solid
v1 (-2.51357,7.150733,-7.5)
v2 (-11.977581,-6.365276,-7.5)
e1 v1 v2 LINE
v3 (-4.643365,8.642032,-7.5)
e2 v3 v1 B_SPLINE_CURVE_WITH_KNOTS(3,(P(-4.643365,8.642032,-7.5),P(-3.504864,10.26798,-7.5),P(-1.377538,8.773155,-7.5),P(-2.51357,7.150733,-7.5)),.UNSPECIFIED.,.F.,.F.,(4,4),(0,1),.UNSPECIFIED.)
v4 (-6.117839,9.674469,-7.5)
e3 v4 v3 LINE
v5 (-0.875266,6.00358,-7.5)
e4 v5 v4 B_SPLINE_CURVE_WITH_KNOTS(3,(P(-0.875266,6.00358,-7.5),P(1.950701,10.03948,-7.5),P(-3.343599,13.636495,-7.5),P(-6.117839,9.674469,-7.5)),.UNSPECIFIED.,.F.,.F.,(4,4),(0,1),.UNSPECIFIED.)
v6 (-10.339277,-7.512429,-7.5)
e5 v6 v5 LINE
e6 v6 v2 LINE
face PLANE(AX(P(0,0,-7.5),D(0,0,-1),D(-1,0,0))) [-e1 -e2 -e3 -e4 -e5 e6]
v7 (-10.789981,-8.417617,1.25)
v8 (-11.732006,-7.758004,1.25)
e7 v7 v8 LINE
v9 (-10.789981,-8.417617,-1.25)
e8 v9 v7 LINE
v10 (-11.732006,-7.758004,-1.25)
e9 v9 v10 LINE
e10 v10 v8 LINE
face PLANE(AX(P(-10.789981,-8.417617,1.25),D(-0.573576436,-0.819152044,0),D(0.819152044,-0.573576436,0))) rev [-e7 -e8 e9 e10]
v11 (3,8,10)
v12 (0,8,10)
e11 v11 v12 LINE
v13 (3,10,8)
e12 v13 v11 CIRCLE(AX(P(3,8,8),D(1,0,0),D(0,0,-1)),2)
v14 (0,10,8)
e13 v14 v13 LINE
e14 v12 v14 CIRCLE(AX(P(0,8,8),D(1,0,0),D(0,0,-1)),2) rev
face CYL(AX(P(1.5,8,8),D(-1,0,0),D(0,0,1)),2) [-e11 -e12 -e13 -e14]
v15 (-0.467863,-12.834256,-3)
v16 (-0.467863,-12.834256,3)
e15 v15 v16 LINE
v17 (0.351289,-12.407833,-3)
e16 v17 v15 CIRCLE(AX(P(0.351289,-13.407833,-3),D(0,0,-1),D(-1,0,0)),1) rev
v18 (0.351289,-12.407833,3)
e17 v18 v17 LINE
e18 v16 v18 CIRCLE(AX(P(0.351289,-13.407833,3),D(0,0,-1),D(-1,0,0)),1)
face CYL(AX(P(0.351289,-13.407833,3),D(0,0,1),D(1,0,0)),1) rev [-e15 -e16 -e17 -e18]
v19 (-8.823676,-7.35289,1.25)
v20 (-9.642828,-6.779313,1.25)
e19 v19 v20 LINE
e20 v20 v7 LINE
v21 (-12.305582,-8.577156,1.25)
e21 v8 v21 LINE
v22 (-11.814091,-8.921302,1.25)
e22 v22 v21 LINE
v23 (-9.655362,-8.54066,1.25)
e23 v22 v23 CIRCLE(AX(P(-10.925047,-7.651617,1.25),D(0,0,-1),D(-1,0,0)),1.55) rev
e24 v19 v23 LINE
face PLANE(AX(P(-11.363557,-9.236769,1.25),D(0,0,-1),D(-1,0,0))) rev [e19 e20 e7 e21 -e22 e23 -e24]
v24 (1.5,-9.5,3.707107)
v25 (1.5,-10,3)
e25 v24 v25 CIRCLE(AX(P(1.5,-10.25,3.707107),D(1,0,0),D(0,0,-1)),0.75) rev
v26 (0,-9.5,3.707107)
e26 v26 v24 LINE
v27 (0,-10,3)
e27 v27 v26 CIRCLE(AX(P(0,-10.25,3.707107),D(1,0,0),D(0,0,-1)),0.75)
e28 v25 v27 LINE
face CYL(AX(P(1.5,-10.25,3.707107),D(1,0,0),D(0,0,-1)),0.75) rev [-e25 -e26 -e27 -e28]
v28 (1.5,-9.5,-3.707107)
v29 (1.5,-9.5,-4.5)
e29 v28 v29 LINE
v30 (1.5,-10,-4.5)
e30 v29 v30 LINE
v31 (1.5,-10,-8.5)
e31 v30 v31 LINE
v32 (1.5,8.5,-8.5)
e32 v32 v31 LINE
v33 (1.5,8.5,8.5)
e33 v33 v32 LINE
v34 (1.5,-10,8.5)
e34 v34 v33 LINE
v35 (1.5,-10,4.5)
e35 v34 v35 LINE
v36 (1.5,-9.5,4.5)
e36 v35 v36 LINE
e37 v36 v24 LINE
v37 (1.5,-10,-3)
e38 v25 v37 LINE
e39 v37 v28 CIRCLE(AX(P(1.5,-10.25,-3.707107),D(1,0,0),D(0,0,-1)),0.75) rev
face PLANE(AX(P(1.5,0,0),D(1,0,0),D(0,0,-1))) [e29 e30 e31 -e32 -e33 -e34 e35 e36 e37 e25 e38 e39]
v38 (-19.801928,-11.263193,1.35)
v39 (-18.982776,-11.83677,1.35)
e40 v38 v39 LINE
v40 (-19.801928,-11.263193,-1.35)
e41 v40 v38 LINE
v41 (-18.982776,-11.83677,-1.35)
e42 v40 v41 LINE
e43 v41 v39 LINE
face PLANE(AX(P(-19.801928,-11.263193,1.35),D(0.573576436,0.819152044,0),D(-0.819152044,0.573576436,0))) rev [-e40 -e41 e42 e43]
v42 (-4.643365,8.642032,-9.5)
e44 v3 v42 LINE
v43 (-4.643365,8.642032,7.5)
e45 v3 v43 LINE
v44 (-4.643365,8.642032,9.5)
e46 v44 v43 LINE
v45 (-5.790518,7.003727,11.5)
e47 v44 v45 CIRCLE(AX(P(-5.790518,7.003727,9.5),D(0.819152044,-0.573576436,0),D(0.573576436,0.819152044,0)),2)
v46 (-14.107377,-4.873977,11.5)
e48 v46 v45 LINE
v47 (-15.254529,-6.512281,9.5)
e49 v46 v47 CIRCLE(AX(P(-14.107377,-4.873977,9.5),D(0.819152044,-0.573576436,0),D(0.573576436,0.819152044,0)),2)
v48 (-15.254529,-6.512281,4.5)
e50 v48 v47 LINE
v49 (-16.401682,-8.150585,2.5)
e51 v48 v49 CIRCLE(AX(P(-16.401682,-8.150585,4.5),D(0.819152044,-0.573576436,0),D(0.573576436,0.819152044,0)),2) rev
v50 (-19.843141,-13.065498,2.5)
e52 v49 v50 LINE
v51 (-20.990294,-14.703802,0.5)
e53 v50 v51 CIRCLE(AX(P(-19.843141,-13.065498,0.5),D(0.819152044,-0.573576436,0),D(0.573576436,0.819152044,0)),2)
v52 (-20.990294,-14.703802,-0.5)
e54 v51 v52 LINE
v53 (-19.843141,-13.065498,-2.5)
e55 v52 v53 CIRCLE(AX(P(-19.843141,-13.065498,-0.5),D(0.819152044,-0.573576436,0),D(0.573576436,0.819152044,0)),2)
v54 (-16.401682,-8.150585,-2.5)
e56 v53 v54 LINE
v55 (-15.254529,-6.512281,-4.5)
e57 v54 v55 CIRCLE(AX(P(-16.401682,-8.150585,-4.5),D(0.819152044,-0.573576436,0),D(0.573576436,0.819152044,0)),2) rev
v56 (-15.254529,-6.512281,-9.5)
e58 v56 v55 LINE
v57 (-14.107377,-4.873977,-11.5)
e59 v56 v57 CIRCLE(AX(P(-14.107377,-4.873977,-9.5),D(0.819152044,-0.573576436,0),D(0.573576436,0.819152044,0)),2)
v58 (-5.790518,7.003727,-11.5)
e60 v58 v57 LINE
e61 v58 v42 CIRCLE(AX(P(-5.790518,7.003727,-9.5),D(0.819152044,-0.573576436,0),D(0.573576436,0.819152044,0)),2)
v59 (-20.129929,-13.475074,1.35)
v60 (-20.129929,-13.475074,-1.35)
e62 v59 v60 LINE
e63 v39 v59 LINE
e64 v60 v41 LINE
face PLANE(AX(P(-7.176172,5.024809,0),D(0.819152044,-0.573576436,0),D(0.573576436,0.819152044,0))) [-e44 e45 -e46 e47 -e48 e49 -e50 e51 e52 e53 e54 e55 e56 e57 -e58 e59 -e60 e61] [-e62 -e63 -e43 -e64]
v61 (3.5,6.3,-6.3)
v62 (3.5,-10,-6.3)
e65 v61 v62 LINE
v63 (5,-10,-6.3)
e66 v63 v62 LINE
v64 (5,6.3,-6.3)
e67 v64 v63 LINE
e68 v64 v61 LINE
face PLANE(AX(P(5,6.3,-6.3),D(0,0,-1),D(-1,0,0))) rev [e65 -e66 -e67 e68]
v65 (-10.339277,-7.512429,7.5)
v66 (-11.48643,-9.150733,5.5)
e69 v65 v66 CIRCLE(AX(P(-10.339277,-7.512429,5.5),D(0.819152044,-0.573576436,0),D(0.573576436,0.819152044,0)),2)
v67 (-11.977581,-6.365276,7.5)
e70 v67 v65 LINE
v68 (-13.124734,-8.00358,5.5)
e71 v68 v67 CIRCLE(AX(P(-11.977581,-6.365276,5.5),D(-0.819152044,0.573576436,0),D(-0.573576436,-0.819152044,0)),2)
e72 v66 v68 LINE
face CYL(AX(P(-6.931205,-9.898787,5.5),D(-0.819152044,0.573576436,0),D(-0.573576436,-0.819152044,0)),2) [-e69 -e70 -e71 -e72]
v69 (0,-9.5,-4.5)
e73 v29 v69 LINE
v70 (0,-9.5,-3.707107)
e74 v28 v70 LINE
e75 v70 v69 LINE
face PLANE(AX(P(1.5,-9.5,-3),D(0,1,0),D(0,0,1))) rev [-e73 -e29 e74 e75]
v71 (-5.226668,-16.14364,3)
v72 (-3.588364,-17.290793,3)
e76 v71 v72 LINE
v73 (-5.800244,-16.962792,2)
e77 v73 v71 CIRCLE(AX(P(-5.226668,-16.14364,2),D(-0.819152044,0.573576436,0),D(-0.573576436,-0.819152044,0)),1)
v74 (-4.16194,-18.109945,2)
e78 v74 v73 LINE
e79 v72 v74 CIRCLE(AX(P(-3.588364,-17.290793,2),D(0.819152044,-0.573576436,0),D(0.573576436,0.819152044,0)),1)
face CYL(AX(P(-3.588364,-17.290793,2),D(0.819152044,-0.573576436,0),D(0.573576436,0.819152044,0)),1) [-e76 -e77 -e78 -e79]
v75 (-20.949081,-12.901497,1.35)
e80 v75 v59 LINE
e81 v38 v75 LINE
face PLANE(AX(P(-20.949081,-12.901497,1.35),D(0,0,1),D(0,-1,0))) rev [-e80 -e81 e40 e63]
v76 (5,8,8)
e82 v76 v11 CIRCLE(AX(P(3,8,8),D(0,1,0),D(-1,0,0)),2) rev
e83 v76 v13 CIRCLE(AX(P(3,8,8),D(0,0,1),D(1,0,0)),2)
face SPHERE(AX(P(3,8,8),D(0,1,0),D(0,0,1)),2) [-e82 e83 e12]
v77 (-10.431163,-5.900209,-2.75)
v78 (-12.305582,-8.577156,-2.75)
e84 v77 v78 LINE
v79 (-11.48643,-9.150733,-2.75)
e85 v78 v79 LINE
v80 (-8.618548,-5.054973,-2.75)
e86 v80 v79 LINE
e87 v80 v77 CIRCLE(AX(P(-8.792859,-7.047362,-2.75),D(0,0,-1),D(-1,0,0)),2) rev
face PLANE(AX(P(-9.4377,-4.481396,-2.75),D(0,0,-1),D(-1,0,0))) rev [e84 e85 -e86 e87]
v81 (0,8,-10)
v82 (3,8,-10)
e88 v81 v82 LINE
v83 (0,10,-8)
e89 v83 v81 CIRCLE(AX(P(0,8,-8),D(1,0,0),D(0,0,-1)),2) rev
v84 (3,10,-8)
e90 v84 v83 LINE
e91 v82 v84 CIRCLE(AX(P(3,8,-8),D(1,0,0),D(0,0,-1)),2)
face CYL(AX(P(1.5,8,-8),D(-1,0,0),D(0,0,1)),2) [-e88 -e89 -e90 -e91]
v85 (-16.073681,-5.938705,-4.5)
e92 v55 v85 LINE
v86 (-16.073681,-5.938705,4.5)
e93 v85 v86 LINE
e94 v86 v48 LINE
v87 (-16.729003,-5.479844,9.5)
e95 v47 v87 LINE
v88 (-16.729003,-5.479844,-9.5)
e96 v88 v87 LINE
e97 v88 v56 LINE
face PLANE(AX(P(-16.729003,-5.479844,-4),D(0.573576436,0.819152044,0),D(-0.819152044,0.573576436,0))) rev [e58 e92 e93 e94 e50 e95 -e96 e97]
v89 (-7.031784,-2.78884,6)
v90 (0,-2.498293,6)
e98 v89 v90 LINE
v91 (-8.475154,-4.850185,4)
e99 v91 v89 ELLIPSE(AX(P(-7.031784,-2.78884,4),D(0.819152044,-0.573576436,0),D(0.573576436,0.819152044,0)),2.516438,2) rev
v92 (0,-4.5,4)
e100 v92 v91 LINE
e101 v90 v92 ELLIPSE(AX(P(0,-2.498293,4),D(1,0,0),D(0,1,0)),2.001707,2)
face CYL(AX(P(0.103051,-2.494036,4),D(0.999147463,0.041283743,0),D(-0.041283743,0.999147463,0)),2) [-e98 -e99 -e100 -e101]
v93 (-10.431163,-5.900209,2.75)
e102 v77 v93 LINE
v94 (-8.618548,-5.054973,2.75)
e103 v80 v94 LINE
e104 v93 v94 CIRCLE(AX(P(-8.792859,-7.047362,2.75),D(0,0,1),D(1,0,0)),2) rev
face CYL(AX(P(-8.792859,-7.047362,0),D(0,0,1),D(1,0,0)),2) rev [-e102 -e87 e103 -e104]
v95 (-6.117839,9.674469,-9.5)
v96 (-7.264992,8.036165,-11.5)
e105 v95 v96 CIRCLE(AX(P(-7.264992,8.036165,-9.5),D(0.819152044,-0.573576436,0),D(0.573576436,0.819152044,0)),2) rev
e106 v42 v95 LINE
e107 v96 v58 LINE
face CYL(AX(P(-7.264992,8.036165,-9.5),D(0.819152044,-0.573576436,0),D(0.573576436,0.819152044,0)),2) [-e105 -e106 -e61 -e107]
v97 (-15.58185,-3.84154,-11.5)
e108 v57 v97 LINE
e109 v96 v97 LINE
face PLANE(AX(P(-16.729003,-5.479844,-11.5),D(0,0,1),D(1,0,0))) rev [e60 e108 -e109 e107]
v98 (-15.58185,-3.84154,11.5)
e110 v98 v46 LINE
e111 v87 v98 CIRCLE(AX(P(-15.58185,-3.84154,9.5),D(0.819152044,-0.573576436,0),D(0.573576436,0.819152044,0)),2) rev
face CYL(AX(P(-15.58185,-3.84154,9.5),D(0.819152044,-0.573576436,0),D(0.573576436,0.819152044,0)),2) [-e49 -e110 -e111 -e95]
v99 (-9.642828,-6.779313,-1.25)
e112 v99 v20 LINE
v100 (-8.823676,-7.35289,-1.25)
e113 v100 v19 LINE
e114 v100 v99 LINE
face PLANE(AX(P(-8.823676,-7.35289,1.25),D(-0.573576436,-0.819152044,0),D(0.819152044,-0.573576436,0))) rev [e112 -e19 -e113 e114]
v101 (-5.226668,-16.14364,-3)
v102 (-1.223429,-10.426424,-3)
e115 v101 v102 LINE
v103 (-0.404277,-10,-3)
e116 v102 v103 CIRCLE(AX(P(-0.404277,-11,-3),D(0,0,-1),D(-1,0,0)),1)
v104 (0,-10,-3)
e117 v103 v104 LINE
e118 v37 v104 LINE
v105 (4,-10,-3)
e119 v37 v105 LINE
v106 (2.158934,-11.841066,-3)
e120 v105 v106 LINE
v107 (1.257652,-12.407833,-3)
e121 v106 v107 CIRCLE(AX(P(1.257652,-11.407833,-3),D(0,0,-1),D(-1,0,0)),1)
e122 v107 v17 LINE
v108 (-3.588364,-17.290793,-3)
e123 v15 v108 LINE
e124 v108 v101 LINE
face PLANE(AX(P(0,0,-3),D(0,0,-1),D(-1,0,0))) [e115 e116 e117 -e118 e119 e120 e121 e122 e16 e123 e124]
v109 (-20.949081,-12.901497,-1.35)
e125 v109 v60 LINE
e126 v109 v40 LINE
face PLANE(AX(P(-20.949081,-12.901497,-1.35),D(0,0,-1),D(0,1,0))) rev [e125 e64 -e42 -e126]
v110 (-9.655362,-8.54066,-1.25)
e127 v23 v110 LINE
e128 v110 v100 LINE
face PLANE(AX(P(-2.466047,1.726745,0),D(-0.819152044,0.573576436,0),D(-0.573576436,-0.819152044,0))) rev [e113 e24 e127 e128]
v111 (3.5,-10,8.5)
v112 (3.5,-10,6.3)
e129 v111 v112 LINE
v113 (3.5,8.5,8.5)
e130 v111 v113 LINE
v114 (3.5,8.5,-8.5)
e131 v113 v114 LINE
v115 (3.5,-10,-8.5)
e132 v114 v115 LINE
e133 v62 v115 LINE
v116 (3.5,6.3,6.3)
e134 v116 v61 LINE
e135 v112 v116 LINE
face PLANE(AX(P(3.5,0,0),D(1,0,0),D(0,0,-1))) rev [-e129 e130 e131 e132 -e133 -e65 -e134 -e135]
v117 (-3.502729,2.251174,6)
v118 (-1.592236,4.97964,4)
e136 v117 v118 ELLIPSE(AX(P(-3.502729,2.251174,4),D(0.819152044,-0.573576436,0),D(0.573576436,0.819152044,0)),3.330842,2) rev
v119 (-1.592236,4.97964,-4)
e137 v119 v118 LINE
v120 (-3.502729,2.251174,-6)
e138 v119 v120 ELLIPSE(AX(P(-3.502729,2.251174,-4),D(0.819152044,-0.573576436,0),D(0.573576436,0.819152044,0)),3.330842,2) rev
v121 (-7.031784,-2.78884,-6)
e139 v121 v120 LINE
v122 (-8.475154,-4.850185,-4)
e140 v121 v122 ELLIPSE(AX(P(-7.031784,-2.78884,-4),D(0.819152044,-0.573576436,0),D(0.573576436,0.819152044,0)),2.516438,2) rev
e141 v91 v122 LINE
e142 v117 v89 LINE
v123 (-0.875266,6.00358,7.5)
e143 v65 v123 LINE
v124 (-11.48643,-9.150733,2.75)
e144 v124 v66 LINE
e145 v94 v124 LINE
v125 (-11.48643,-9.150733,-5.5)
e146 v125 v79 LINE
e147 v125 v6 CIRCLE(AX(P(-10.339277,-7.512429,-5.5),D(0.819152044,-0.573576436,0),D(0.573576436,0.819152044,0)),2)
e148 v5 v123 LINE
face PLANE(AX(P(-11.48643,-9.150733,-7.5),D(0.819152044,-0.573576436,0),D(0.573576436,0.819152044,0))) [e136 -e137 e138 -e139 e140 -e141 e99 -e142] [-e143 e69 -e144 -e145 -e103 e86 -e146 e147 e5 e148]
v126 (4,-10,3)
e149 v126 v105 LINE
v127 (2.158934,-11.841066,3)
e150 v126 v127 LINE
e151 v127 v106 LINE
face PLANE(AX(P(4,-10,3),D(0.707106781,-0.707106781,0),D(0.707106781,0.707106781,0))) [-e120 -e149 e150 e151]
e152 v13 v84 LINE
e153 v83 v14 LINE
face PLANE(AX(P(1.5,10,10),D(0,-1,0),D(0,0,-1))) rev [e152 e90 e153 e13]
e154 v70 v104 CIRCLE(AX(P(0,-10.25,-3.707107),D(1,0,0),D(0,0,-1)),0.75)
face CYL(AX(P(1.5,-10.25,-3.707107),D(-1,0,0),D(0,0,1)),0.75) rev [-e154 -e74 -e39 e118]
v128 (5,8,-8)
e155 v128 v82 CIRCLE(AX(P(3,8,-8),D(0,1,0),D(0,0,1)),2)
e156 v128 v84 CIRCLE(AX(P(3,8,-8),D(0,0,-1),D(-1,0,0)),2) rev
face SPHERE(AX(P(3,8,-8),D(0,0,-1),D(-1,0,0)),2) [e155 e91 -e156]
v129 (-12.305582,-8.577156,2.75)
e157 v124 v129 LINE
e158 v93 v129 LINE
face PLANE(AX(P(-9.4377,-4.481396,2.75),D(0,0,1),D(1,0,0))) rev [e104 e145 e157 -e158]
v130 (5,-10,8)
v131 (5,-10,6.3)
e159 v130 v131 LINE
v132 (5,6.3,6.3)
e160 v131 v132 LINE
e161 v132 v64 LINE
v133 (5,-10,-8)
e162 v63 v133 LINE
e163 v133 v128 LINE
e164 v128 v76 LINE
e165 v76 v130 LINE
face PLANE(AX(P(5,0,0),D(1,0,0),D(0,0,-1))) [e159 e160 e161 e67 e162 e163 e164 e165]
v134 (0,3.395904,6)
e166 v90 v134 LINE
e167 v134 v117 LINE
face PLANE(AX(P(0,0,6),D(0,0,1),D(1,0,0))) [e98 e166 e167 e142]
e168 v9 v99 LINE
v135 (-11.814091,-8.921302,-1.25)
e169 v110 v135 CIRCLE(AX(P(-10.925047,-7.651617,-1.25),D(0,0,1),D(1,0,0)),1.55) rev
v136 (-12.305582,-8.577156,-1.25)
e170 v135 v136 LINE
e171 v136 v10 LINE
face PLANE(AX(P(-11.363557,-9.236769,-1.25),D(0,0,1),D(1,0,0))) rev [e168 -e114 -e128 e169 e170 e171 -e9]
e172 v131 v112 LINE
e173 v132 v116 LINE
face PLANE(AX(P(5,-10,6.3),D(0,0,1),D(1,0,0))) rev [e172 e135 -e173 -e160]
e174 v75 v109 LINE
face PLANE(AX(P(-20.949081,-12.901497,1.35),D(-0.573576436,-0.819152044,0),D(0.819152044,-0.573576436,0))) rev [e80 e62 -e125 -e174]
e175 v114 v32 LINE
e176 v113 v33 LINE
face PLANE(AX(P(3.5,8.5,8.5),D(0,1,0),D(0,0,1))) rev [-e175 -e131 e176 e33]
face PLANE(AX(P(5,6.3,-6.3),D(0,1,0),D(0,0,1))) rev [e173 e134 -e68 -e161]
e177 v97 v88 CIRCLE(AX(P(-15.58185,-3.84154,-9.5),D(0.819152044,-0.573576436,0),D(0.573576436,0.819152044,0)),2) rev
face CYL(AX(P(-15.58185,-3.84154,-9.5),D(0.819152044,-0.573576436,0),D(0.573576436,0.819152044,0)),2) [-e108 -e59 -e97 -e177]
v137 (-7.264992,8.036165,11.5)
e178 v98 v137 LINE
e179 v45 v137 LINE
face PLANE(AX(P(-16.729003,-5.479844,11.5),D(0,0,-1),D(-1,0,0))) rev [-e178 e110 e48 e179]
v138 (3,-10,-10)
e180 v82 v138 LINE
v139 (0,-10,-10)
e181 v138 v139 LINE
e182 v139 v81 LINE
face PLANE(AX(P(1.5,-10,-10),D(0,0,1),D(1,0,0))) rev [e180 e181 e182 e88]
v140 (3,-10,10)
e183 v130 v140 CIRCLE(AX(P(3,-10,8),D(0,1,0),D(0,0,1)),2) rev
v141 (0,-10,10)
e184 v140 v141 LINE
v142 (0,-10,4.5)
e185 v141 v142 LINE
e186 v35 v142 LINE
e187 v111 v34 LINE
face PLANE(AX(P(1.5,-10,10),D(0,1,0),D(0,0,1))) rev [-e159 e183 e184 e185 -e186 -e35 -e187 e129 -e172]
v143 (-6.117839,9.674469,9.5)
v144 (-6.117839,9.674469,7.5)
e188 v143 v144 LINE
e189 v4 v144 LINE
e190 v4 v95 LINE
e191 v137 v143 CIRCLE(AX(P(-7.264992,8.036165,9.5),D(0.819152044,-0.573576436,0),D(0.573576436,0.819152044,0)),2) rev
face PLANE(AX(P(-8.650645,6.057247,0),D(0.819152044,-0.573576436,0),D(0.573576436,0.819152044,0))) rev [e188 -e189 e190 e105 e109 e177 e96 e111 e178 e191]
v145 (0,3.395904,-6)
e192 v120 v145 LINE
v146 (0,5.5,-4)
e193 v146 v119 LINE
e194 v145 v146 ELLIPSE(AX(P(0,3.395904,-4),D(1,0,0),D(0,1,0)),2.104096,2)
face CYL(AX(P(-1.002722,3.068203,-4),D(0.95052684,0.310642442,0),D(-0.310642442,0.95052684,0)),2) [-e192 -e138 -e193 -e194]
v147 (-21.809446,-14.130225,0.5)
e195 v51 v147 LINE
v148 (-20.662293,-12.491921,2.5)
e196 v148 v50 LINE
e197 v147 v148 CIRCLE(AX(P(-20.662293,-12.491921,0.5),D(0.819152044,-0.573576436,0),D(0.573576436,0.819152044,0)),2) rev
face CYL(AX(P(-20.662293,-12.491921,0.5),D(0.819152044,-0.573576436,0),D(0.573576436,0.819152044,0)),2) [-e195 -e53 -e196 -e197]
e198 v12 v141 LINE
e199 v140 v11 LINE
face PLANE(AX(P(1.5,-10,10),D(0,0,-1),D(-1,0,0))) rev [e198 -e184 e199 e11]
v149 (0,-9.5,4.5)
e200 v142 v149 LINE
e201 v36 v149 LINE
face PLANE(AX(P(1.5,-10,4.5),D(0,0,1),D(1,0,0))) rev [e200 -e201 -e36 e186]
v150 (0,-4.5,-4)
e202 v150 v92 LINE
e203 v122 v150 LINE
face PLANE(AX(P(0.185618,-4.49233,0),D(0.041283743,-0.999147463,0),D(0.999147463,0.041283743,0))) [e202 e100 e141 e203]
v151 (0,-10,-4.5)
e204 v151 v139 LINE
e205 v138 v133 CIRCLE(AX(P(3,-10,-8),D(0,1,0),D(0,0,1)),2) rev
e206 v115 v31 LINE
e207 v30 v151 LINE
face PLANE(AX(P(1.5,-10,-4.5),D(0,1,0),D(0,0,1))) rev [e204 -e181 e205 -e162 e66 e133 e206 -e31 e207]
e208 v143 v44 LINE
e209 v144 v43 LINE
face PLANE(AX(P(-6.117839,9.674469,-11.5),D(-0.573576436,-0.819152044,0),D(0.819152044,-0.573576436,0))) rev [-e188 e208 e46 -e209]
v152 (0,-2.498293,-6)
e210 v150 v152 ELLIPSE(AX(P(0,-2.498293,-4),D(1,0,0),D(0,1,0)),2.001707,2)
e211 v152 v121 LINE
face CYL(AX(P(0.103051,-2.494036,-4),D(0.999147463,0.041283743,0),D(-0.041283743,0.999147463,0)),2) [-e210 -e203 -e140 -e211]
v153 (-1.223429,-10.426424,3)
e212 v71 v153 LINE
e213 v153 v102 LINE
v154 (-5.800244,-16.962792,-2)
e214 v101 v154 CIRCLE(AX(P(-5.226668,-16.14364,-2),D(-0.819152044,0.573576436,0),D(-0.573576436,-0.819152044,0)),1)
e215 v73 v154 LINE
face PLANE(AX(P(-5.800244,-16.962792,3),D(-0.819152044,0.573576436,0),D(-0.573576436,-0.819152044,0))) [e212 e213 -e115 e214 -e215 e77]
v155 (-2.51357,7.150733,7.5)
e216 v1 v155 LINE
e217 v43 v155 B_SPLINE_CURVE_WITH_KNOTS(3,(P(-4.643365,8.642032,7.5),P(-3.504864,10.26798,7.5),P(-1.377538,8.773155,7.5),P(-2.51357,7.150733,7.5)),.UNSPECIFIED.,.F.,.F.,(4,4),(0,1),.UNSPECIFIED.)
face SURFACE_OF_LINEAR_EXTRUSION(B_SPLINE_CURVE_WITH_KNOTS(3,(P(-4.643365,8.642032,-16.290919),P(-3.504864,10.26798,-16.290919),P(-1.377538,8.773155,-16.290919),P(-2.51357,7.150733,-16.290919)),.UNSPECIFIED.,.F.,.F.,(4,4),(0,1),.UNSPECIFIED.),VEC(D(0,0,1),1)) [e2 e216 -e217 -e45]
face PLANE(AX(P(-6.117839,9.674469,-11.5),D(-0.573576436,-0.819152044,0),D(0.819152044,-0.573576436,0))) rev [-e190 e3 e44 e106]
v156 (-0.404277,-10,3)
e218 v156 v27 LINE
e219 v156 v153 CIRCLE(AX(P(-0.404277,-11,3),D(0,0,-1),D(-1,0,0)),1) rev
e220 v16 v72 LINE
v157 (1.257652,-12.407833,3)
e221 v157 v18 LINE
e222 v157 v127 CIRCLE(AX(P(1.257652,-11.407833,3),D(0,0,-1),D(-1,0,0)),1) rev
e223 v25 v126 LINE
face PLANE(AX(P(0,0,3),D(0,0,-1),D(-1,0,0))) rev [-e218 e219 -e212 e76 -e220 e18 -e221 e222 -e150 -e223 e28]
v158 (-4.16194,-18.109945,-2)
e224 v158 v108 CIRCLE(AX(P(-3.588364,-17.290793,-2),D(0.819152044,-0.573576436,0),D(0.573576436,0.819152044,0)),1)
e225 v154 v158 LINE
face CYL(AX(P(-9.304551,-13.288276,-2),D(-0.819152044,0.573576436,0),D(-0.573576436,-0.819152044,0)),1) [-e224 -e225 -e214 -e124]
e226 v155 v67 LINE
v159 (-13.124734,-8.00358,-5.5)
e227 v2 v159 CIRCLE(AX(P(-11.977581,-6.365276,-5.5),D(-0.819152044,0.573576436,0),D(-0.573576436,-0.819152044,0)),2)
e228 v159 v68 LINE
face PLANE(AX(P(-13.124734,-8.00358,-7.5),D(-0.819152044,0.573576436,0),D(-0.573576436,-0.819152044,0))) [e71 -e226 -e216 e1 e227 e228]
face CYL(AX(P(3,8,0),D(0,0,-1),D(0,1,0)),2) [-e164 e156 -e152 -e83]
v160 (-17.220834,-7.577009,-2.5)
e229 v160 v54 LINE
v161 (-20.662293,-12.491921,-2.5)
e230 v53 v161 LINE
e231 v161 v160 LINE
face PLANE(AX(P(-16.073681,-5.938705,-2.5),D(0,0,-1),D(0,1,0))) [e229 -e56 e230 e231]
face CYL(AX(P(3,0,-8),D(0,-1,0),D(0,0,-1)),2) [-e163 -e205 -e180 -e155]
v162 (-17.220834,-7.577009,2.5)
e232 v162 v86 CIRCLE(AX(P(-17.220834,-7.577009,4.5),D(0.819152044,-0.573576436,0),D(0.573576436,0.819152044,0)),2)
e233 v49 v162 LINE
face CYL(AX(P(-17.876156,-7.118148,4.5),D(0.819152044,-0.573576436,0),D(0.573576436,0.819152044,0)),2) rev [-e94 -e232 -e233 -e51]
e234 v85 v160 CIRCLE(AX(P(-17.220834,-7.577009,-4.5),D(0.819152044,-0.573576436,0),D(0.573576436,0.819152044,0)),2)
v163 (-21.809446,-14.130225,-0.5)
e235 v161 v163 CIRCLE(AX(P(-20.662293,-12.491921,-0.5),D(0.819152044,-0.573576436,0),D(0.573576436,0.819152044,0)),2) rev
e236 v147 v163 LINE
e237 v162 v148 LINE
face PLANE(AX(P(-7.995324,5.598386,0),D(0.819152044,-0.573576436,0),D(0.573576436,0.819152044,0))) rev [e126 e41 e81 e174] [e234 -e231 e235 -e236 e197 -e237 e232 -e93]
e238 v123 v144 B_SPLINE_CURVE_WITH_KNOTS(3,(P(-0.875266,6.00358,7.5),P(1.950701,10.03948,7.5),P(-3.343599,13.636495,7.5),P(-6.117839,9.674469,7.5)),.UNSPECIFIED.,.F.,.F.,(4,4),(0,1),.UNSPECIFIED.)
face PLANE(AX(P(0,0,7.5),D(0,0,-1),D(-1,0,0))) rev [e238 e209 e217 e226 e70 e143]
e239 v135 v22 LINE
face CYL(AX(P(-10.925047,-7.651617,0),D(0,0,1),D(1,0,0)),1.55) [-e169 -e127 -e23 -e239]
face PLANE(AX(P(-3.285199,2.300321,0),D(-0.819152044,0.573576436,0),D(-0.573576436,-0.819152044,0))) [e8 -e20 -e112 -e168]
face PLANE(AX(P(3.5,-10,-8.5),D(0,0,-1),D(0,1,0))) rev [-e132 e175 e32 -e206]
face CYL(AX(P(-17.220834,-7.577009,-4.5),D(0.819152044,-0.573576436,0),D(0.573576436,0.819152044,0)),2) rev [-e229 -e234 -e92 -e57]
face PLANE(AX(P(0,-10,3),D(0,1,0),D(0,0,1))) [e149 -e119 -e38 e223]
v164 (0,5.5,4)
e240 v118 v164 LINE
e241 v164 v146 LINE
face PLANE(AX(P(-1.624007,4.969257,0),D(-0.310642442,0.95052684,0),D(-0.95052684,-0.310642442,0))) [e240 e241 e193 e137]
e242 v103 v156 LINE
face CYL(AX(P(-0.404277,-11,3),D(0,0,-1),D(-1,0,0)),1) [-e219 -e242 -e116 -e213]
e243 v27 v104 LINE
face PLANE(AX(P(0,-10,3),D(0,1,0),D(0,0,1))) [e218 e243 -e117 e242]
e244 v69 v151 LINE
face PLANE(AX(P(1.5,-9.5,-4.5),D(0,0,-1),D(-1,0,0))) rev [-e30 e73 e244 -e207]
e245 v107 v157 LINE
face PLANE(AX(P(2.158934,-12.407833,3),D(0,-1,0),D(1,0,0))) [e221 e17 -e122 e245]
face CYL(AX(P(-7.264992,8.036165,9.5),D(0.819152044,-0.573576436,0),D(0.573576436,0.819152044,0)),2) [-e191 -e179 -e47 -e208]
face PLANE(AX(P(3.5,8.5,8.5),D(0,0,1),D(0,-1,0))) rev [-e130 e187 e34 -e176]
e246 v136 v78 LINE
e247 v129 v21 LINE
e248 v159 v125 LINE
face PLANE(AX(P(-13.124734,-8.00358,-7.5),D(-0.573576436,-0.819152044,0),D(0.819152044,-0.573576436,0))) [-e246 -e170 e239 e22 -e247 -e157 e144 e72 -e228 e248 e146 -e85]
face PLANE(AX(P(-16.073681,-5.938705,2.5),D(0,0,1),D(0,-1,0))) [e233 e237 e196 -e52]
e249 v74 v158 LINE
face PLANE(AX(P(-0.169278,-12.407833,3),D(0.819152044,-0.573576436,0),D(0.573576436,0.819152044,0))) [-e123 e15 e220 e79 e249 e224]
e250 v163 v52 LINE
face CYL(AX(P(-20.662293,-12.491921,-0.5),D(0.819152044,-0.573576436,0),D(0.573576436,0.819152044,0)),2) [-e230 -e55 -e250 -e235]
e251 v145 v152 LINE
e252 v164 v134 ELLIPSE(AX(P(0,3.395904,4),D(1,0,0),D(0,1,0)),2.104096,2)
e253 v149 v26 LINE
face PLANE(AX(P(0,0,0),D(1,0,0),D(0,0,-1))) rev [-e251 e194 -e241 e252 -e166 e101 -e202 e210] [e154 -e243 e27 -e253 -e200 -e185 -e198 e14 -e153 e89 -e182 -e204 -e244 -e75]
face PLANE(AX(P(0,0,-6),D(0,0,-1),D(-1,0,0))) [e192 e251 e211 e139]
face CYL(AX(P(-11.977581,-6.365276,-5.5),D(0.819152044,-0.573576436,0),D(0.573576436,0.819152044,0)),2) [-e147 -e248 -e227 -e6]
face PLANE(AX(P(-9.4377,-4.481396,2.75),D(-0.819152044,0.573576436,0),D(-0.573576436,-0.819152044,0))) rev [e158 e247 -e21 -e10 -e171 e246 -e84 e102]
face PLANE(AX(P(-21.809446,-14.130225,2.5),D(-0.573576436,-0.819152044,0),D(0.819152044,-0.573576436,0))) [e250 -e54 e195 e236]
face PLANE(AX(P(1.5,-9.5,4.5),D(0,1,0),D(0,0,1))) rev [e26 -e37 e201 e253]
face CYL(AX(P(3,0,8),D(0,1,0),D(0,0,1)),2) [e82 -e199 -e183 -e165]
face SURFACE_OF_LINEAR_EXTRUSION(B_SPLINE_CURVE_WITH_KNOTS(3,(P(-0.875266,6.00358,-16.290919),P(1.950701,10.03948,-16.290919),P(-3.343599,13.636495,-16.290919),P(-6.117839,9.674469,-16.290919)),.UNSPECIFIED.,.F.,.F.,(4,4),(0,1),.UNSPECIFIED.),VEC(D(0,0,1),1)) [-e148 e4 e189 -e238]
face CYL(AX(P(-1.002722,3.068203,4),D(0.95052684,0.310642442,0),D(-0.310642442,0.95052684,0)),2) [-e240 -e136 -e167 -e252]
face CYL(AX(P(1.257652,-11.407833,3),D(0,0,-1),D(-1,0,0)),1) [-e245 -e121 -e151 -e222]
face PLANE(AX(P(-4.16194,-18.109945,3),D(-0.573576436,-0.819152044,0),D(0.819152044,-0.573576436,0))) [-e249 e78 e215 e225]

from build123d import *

# Parameters (mm, degrees)
BOSS_EXTRUDE1_DEPTH      = 1.5
FILLET7_R                = 0.75
BOSS_EXTRUDE2_DEPTH      = 2
BOSS_EXTRUDE3_DEPTH      = 1.5
BOSS_EXTRUDE5_DEPTH      = 3
BOSS_EXTRUDE5_DEPTH_BACK = 3
BOSS_EXTRUDE4_DEPTH      = 7.5
BOSS_EXTRUDE4_DEPTH_BACK = 7.5
BOSS_EXTRUDE6_DEPTH      = 1.8
BOSS_EXTRUDE7_DEPTH      = 15
SKETCH18_W               = 1
SKETCH18_H               = 5.5
CUT_EXTRUDE2_DEPTH       = 5
FILLET8_R                = 2
SKETCH14_W               = 2.5
SKETCH14_H               = 1
BOSS_EXTRUDE9_DEPTH      = 1.15
SKETCH16_W               = 2.5
SKETCH16_H               = 3
BOSS_EXTRUDE11_DEPTH     = 1
SKETCH15_W               = 5
SKETCH15_H               = 10
SKETCH15_W_2             = 2.7
SKETCH15_H_2             = 2
BOSS_EXTRUDE10_DEPTH     = 1
FILLET2_R                = 1
FILLET3_R                = 2
FILLET4_R                = 2
FILLET5_R                = 1.55


with BuildPart() as part:
    # Sketch1 → Boss-Extrude1 (new body)
    with BuildSketch(Plane(origin=(0, 0, 0), x_dir=(0, 0, -1), z_dir=(1, 0, 0))):
        Polygon((-10, -10), (-10, 10), (10, 10), (10, -10), (4.5, -10), (4.5, -9.5), (3, -9.5), (3, -10), (-3, -10), (-3, -9.5), (-4.5, -9.5), (-4.5, -10), align=None)
    extrude(amount=BOSS_EXTRUDE1_DEPTH)

    # Fillet7
    # the kernel refuses this fillet: 0.75 mm, written as the material it adds along each edge
    with BuildSketch(Plane(origin=(0, -9.5, -3), x_dir=(0, 0, -1), z_dir=(1, 0, 0))) as fillet7_piece_1:
        with BuildLine():
            CenterArc((0.707106781, -0.75), FILLET7_R, 90, 70.528779366)
            Line((0, -0.5), (-0.014142136, -0.495))
            ThreePointArc((-0.014142136, -0.495), (-0.015, -0.25), (-0.015, 0))
            Line((-0.015, 0), (0, 0.015))
            Line((0, 0.015), (0.707106781, 0.015))
            Line((0.707106781, 0.015), (0.707106781, 0))
        make_face()
    extrude(amount=1.5)
    with BuildSketch(Plane(origin=(0, -9.5, 3), x_dir=(0, -1, 0), z_dir=(1, 0, 0))) as fillet7_piece_2:
        with BuildLine():
            CenterArc((0.75, -0.707106781), FILLET7_R, 109.471220634, 70.528779366)
            Line((0, -0.707106781), (-0.015, -0.707106781))
            Line((-0.015, -0.707106781), (-0.015, 0))
            Line((-0.015, 0), (0, 0.015))
            ThreePointArc((0, 0.015), (0.25, 0.015), (0.495, 0.014142136))
            Line((0.495, 0.014142136), (0.5, 0))
        make_face()
    extrude(amount=1.5)

    # Sketch3 → Boss-Extrude2 (add)
    with BuildSketch(Plane(origin=(1.5, 0, 0), x_dir=(0, 0, -1), z_dir=(1, 0, 0))):
        Polygon((-10, 10), (-10, -10), (-8.5, -10), (-8.5, 8.5), (8.5, 8.5), (8.5, -10), (10, -10), (10, 10), align=None)
    extrude(amount=BOSS_EXTRUDE2_DEPTH)

    # Sketch5 → Boss-Extrude3 (add)
    with BuildSketch(Plane(origin=(3.5, 0, 0), x_dir=(0, 0, -1), z_dir=(1, 0, 0))):
        Polygon((-10, 10), (-10, -10), (-6.3, -10), (-6.3, 6.3), (6.3, 6.3), (6.3, -10), (10, -10), (10, 10), align=None)
    extrude(amount=BOSS_EXTRUDE3_DEPTH)

    # Sketch9 → Boss-Extrude5 (add, two sides: drawn at the far end of the back side and taken through both)
    with BuildSketch(Plane.XY.offset(-BOSS_EXTRUDE5_DEPTH_BACK)):
        Polygon((0, -10), (4, -10), (2.158934381, -11.841065619), (2.158934381, -12.407832924), (-0.169277933, -12.407832924), (-4.161939967, -18.109945249), (-5.800244055, -16.962792376), (-0.924844346, -10), align=None)
    extrude(amount=BOSS_EXTRUDE5_DEPTH + BOSS_EXTRUDE5_DEPTH_BACK)



with BuildPart() as body_2:
    # Sketch6 → Boss-Extrude4 (new, two sides: drawn at the far end of the back side and taken through both)
    with BuildSketch(Plane.XY.offset(-BOSS_EXTRUDE4_DEPTH_BACK)):
        Polygon((-13.124734081, -8.003579973), (-11.486429992, -9.150732846), (-0.875265919, 6.003579973), (-2.513570008, 7.150732846), align=None)
    extrude(amount=BOSS_EXTRUDE4_DEPTH + BOSS_EXTRUDE4_DEPTH_BACK)


with BuildPart() as part_1:
    add(part.part)

    add(body_2.part)  # Loft1 merges body 2
    # Sketch7 → Loft1 section 0
    with BuildSketch(Plane(origin=(-3.408072147, 2.386357808, 0), x_dir=(0, 0, -1), z_dir=(0.8191520442889888, -0.5735764363510506, 0))):
        with BuildLine():
            Line((-6, -8.834187099), (6, -8.834187099))
            Line((6, -8.834187099), (6, 3.165812901))
            Line((6, 3.165812901), (-6, 3.165812901))
            Line((-6, 3.165812901), (-6, -8.834187099))
        make_face()
    # Sketch8 → Loft1 section 1
    with BuildSketch(Plane.ZY):
        with BuildLine():
            Line((-6, -4.5), (6, -4.5))
            Line((6, -4.5), (6, 5.5))
            Line((6, 5.5), (-6, 5.5))
            Line((-6, 5.5), (-6, -4.5))
        make_face()
    loft()



with BuildPart() as body_2_2:
    # Sketch11 → Boss-Extrude6 (new body)
    with BuildSketch(Plane(origin=(-7.176171551, 5.024809415, 0), x_dir=(0, 0, 1), z_dir=(-0.8191520442889889, 0.5735764363510503, 0))):
        Polygon((-11.5, -14.084187099), (-4, -14.084187099), (11.5, -14.084187099), (11.5, 4.415812901), (-11.5, 4.415812901), align=None)
    extrude(amount=BOSS_EXTRUDE6_DEPTH)


with BuildPart() as part_2:
    add(part_1.part)

    add(body_2_2.part)  # Boss-Extrude7 merges body 2 2
    # Sketch12 → Boss-Extrude7 (add)
    with BuildSketch(Plane.XY.offset(7.5)):
        with BuildLine():
            Line((-6.117839003, 9.674469166), (-4.643365323, 8.642031581))
            add(Edge.make_bspline(
                [(-4.643365323, 8.642031581), (-3.504863732, 10.267980359), (-1.377538094, 8.77315456), (-2.513570008, 7.150732846)],
                knots=[0, 0, 0, 0, 1, 1, 1, 1], degree=3))
            Line((-2.513570008, 7.150732846), (-0.875265919, 6.003579973))
            add(Edge.make_bspline(
                [(-6.117839003, 9.674469166), (-3.343598781, 13.636494809), (1.950701407, 10.039479578), (-0.875265919, 6.003579973)],
                knots=[0, 0, 0, 0, 1, 1, 1, 1], degree=3))
        make_face()
    extrude(amount=-BOSS_EXTRUDE7_DEPTH)

    # Sketch18 → Cut-Extrude2 (cut)
    with BuildSketch(Plane(origin=(-8.078357845, -11.537090654, 0), x_dir=(0.8191520442889898, -0.5735764363510492, 0), z_dir=(-0.573576436351049, -0.8191520442889897, 0))):
        with Locations((-4.660487874, 0)):
            Rectangle(SKETCH18_W, SKETCH18_H)
    extrude(amount=-CUT_EXTRUDE2_DEPTH, mode=Mode.SUBTRACT)

    # Fillet8
    # the kernel refuses this fillet: 2 mm, written as the material it adds along each edge
    with BuildSketch(Plane(origin=(-9.437699854, -4.481396188, -7.080127019), x_dir=(0.8191520442889484, -0.5735764363511082, 0), z_dir=(0, 0, 1))) as fillet8_piece_1:
        with BuildLine():
            CenterArc((2, -1.732050808), FILLET8_R, 120, 60)
            Line((0, -1.732050808), (-0.04, -1.732050808))
            Line((-0.04, -1.732050808), (-0.04, 0))
            Line((-0.04, 0), (0, 0.04))
            ThreePointArc((0, 0.04), (0.5, 0.04), (0.98, 0.034641016))
            Line((0.98, 0.034641016), (1, 0))
        make_face()
    extrude(amount=14.160254038)

    # Sketch14 → Boss-Extrude9 (add)
    with BuildSketch(Plane(origin=(-4.227224191, 2.959934244, 0), x_dir=(0, 0, -1), z_dir=(0.8191520442889896, -0.5735764363510492, 0))):
        with Locations((0, -13.584187099)):
            Rectangle(SKETCH14_W, SKETCH14_H)
    extrude(amount=BOSS_EXTRUDE9_DEPTH)

    # Sketch16 → Boss-Extrude11 (add)
    with BuildSketch(Plane(origin=(-3.28519934, 2.300321343, 0), x_dir=(0, 0, -1), z_dir=(0.8191520442889892, -0.5735764363510499, 0))):
        with Locations((0, -12.584187099)):
            Rectangle(SKETCH16_W, SKETCH16_H)
    extrude(amount=BOSS_EXTRUDE11_DEPTH)

    # Sketch15 → Boss-Extrude10 (add)
    with BuildSketch(Plane(origin=(-7.176171551, 5.024809415, 0), x_dir=(0, 0, -1), z_dir=(0.8191520442889889, -0.5735764363510503, 0))):
        with Locations((0, -19.084187099)):
            Rectangle(SKETCH15_W, SKETCH15_H)
        with Locations((0, -21.584187099)):
            Rectangle(SKETCH15_W_2, SKETCH15_H_2, mode=Mode.SUBTRACT)
    extrude(amount=-BOSS_EXTRUDE10_DEPTH)

    # Fillet2
    # the kernel refuses this fillet: 1 mm, written as the material it adds along each edge
    with BuildSketch(Plane(origin=(-0.169277933, -12.407832924, 3), x_dir=(1, 0, 0), z_dir=(0, 0, -1))) as fillet2_piece_1:
        with BuildLine():
            CenterArc((FILLET2_R * 0.520567050552, FILLET2_R), FILLET2_R, 215, 55)
            Line((-FILLET2_R * 0.298584993737, FILLET2_R * 0.426423563649), (0, 0))
            Line((0, 0), (FILLET2_R * 0.520567050552, 0))
        make_face()
    extrude(amount=6)
    # the kernel refuses this fillet: 1 mm, written as the material it takes off along each edge
    with BuildSketch(Plane(origin=(2.158934381, -12.407832924, 5.253205262), x_dir=(0, 1, 0), z_dir=(0, 0, -1))) as fillet2_2_piece_1:
        with BuildLine():
            CenterArc((1, -0.901282105), FILLET2_R, 115.672890719, 64.327109281)
            Line((0, -0.901282105), (0, 0))
            Line((0, 0), (0.566767305, 0))
        make_face()
    extrude(amount=10.506410523, mode=Mode.SUBTRACT)
    with BuildSketch(Plane(origin=(-2.114059856, -19.54388634, -3), x_dir=(0.5735764363510425, 0.8191520442889944, 0), z_dir=(-0.8191520442889945, 0.5735764363510425, 0))) as fillet2_2_piece_2:
        with BuildLine():
            CenterArc((FILLET2_R, -FILLET2_R), FILLET2_R, 90, 90)
            Line((0, -FILLET2_R), (0, 0))
            Line((0, 0), (FILLET2_R, 0))
        make_face()
    extrude(amount=7, mode=Mode.SUBTRACT)
    with BuildSketch(Plane(origin=(-2.114059856, -19.54388634, 3), x_dir=(0.5735764363510425, 0.8191520442889944, 0), z_dir=(-0.8191520442889945, 0.5735764363510425, 0))) as fillet2_2_piece_3:
        with BuildLine():
            CenterArc((FILLET2_R, FILLET2_R), FILLET2_R, 180, 90)
            Line((0, FILLET2_R), (0, 0))
            Line((0, 0), (FILLET2_R, 0))
        make_face()
    extrude(amount=7, mode=Mode.SUBTRACT)
    with BuildSketch(Plane(origin=(-0.924844346, -10, -4.301417626), x_dir=(1, 0, 0), z_dir=(0, 0, 1))) as fillet2_2_piece_4:
        with BuildLine():
            CenterArc((FILLET2_R * 0.520567050552, -FILLET2_R), FILLET2_R, 90, 55)
            Line((-FILLET2_R * 0.298584993737, -FILLET2_R * 0.426423563649), (0, 0))
            Line((0, 0), (FILLET2_R * 0.520567050552, 0))
        make_face()
    extrude(amount=8.602835253, mode=Mode.SUBTRACT)

    # Fillet3
    fillet3_edges = [part_2.edges().sort_by_distance(p)[0] for p in [
        (-21.399869781, -14.417013464, 2.5),
        (-15.664105418, -6.225493021, 2.5),
        (-15.664105418, -6.225493021, -2.5),
        (-21.399869781, -14.417013464, -2.5),
    ]]
    fillet(fillet3_edges, radius=FILLET3_R)

    # Fillet4
    # the kernel refuses this fillet: 2 mm, written as the material it takes off along each edge
    with BuildSketch(Plane(origin=(3, 8, 8), x_dir=(0, 0, 1), z_dir=(0, 1, 0))) as fillet4_piece_1_section:
        Polygon((0, 0), (FILLET4_R * 1.02, 0), (FILLET4_R * 1.02, FILLET4_R * 1.02), (0, FILLET4_R * 1.02), align=None)
    fillet4_piece_1 = extrude(amount=FILLET4_R * 1.02, mode=Mode.PRIVATE)
    fillet4_piece_1 = fillet4_piece_1 - Plane(origin=(3, 8, 8), x_dir=(-0.7071067811865475, 0, -0.7071067811865475), z_dir=(0, 1, 0)) * Sphere(FILLET4_R, mode=Mode.PRIVATE)
    add(fillet4_piece_1, mode=Mode.SUBTRACT)
    with BuildSketch(Plane(origin=(3, 8, -8), x_dir=(0, 0, -1), z_dir=(0, 1, 0))) as fillet4_piece_2_section:
        Polygon((0, 0), (FILLET4_R * 1.02, 0), (FILLET4_R * 1.02, -FILLET4_R * 1.02), (0, -FILLET4_R * 1.02), align=None)
    fillet4_piece_2 = extrude(amount=FILLET4_R * 1.02, mode=Mode.PRIVATE)
    fillet4_piece_2 = fillet4_piece_2 - Plane(origin=(3, 8, -8), x_dir=(-0.7071067811865475, 0, 0.7071067811865475), z_dir=(0, 1, 0)) * Sphere(FILLET4_R, mode=Mode.PRIVATE)
    add(fillet4_piece_2, mode=Mode.SUBTRACT)
    with BuildSketch(Plane(origin=(5, 8, 10), x_dir=(0, 0, -1), z_dir=(0, -1, 0))) as fillet4_piece_3:
        with BuildLine():
            CenterArc((FILLET4_R, -FILLET4_R), FILLET4_R, 90, 90)
            Line((0, -FILLET4_R), (0, 0))
            Line((0, 0), (FILLET4_R, 0))
        make_face()
    extrude(amount=23, mode=Mode.SUBTRACT)
    with BuildSketch(Plane(origin=(5, 10, -8), x_dir=(0, -1, 0), z_dir=(0, 0, 1))) as fillet4_piece_4:
        with BuildLine():
            CenterArc((FILLET4_R, -FILLET4_R), FILLET4_R, 90, 90)
            Line((0, -FILLET4_R), (0, 0))
            Line((0, 0), (FILLET4_R, 0))
        make_face()
    extrude(amount=16, mode=Mode.SUBTRACT)
    with BuildSketch(Plane(origin=(5, -15, -10), x_dir=(-1, 0, 0), z_dir=(0, 1, 0))) as fillet4_piece_5:
        with BuildLine():
            CenterArc((FILLET4_R, FILLET4_R), FILLET4_R, 180, 90)
            Line((0, FILLET4_R), (0, 0))
            Line((0, 0), (FILLET4_R, 0))
        make_face()
    extrude(amount=23, mode=Mode.SUBTRACT)
    with BuildSketch(Plane(origin=(3, 10, -10), x_dir=(0, -1, 0), z_dir=(-1, 0, 0))) as fillet4_piece_6_section:
        with BuildLine():
            CenterArc((FILLET4_R, FILLET4_R), FILLET4_R, 180, 90)
            Line((0, FILLET4_R), (0, 0))
            Line((0, 0), (FILLET4_R, 0))
        make_face()
    fillet4_piece_6 = extrude(amount=8, mode=Mode.PRIVATE)
    fillet4_piece_6 = split(fillet4_piece_6, bisect_by=Plane(origin=(-0.152626661, 5.497582517, -10), z_dir=(0.5735764363510504, 0.8191520442889889, 0)), keep=Keep.TOP, mode=Mode.PRIVATE)
    add(fillet4_piece_6, mode=Mode.SUBTRACT)
    with BuildSketch(Plane(origin=(3, 10, 10), x_dir=(0, 0, -1), z_dir=(-1, 0, 0))) as fillet4_piece_7_section:
        with BuildLine():
            CenterArc((FILLET4_R, FILLET4_R), FILLET4_R, 180, 90)
            Line((0, FILLET4_R), (0, 0))
            Line((0, 0), (FILLET4_R, 0))
        make_face()
    fillet4_piece_7 = extrude(amount=8, mode=Mode.PRIVATE)
    fillet4_piece_7 = split(fillet4_piece_7, bisect_by=Plane(origin=(-0.152626661, 5.497582517, 10), z_dir=(0.5735764363510504, 0.8191520442889889, 0)), keep=Keep.TOP, mode=Mode.PRIVATE)
    add(fillet4_piece_7, mode=Mode.SUBTRACT)
    with BuildSketch(Plane(origin=(-0.547605102, 5.774149399, -11.5), x_dir=(0, 0, 1), z_dir=(-0.8191520442889889, 0.5735764363510504, 0)), Plane(origin=(-11.158769174, -9.380163421, -11.5), x_dir=(0.5735764363510504, 0.8191520442889889, 0), z_dir=(-0.8191520442889889, 0.5735764363510504, 0)), Plane(origin=(-0.547605102, 5.774149399, 11.5), x_dir=(-0.5735764363510504, -0.8191520442889888, 0), z_dir=(-0.8191520442889889, 0.5735764363510504, 0))) as fillet4_piece_8:
        with BuildLine():
            CenterArc((FILLET4_R, -FILLET4_R), FILLET4_R, 90, 90)
            Line((0, -FILLET4_R), (0, 0))
            Line((0, 0), (FILLET4_R, 0))
        make_face()
    extrude(amount=11.8, mode=Mode.SUBTRACT)
    with BuildSketch(Plane(origin=(-11.158769174, -9.380163421, 11.5), x_dir=(0.5735764363510504, 0.8191520442889888, 0), z_dir=(-0.8191520442889889, 0.5735764363510504, 0))) as fillet4_piece_9:
        with BuildLine():
            CenterArc((FILLET4_R, FILLET4_R), FILLET4_R, 180, 90)
            Line((0, FILLET4_R), (0, 0))
            Line((0, 0), (FILLET4_R, 0))
        make_face()
    extrude(amount=11.8, mode=Mode.SUBTRACT)
    with BuildSketch(Plane(origin=(-6.344870663, 3.426427706, -6), x_dir=(0.310642442370597, -0.9505268397041876, 0), z_dir=(0.9505268397041876, 0.310642442370597, 0))) as fillet4_piece_10_section:
        with BuildLine():
            CenterArc((FILLET4_R, -FILLET4_R), FILLET4_R, 90, 90)
            Line((0, -FILLET4_R), (0, 0))
            Line((0, 0), (FILLET4_R, 0))
        make_face()
    fillet4_piece_10 = extrude(amount=11.675109422, mode=Mode.PRIVATE)
    fillet4_piece_10 = split(fillet4_piece_10, bisect_by=Plane(origin=(-3.885576276, 1.704411238, -6), z_dir=(0.8191520442889891, -0.5735764363510499, 0)), keep=Keep.TOP, mode=Mode.PRIVATE)
    fillet4_piece_10 = split(fillet4_piece_10, bisect_by=Plane(origin=(0, 3.426427706, -6), z_dir=(-1, 0, 0)), keep=Keep.TOP, mode=Mode.PRIVATE)
    add(fillet4_piece_10, mode=Mode.SUBTRACT)
    with BuildSketch(Plane(origin=(-6.344870663, 3.426427706, 6), x_dir=(0, 0, -1), z_dir=(0.9505268397041876, 0.3106424423705969, 0))) as fillet4_piece_11_section:
        with BuildLine():
            CenterArc((FILLET4_R, -FILLET4_R), FILLET4_R, 90, 90)
            Line((0, -FILLET4_R), (0, 0))
            Line((0, 0), (FILLET4_R, 0))
        make_face()
    fillet4_piece_11 = extrude(amount=11.675109422, mode=Mode.PRIVATE)
    fillet4_piece_11 = split(fillet4_piece_11, bisect_by=Plane(origin=(-3.885576276, 1.704411238, 6), z_dir=(0.8191520442889891, -0.5735764363510499, 0)), keep=Keep.TOP, mode=Mode.PRIVATE)
    fillet4_piece_11 = split(fillet4_piece_11, bisect_by=Plane(origin=(0, 3.426427706, 6), z_dir=(-1, 0, 0)), keep=Keep.TOP, mode=Mode.PRIVATE)
    add(fillet4_piece_11, mode=Mode.SUBTRACT)
    with BuildSketch(Plane(origin=(-13.470891015, -5.056603329, -6), x_dir=(-0.041283743098950804, 0.9991474628680893, 0), z_dir=(0.9991474628680892, 0.0412837430989508, 0))) as fillet4_piece_12_section:
        with BuildLine():
            CenterArc((FILLET4_R, FILLET4_R), FILLET4_R, 180, 90)
            Line((0, FILLET4_R), (0, 0))
            Line((0, 0), (FILLET4_R, 0))
        make_face()
    fillet4_piece_12 = extrude(amount=18.48238525, mode=Mode.PRIVATE)
    fillet4_piece_12 = split(fillet4_piece_12, bisect_by=Plane(origin=(-10.215686034, -7.335922395, -6), z_dir=(0.8191520442889891, -0.5735764363510499, 0)), keep=Keep.TOP, mode=Mode.PRIVATE)
    fillet4_piece_12 = split(fillet4_piece_12, bisect_by=Plane(origin=(0, -5.056603329, -6), z_dir=(-1, 0, 0)), keep=Keep.TOP, mode=Mode.PRIVATE)
    add(fillet4_piece_12, mode=Mode.SUBTRACT)
    with BuildSketch(Plane(origin=(-13.470891015, -5.056603329, 6), x_dir=(0, 0, -1), z_dir=(0.9991474628680892, 0.0412837430989508, 0))) as fillet4_piece_13_section:
        with BuildLine():
            CenterArc((FILLET4_R, FILLET4_R), FILLET4_R, 180, 90)
            Line((0, FILLET4_R), (0, 0))
            Line((0, 0), (FILLET4_R, 0))
        make_face()
    fillet4_piece_13 = extrude(amount=18.48238525, mode=Mode.PRIVATE)
    fillet4_piece_13 = split(fillet4_piece_13, bisect_by=Plane(origin=(-10.215686034, -7.335922395, 6), z_dir=(0.8191520442889891, -0.5735764363510499, 0)), keep=Keep.TOP, mode=Mode.PRIVATE)
    fillet4_piece_13 = split(fillet4_piece_13, bisect_by=Plane(origin=(0, -5.056603329, 6), z_dir=(-1, 0, 0)), keep=Keep.TOP, mode=Mode.PRIVATE)
    add(fillet4_piece_13, mode=Mode.SUBTRACT)
    with BuildSketch(Plane(origin=(-13.124734081, -8.003579973, -7.5), x_dir=(0.5735764363510486, 0.8191520442889901, 0), z_dir=(0.8191520442889901, -0.5735764363510486, 0)), Plane(origin=(-13.124734081, -8.003579973, 7.5), x_dir=(0, 0, -1), z_dir=(0.8191520442889901, -0.5735764363510486, 0))) as fillet4_piece_14:
        with BuildLine():
            CenterArc((FILLET4_R, FILLET4_R), FILLET4_R, 180, 90)
            Line((0, FILLET4_R), (0, 0))
            Line((0, 0), (FILLET4_R, 0))
        make_face()
    extrude(amount=7, mode=Mode.SUBTRACT)

    # Fillet5
    fillet5_edges = [part_2.edges().sort_by_distance(p)[0] for p in [
        (-10.544405141, -9.810345748, 0),
    ]]
    fillet(fillet5_edges, radius=FILLET5_R)


solid = part_2.part
